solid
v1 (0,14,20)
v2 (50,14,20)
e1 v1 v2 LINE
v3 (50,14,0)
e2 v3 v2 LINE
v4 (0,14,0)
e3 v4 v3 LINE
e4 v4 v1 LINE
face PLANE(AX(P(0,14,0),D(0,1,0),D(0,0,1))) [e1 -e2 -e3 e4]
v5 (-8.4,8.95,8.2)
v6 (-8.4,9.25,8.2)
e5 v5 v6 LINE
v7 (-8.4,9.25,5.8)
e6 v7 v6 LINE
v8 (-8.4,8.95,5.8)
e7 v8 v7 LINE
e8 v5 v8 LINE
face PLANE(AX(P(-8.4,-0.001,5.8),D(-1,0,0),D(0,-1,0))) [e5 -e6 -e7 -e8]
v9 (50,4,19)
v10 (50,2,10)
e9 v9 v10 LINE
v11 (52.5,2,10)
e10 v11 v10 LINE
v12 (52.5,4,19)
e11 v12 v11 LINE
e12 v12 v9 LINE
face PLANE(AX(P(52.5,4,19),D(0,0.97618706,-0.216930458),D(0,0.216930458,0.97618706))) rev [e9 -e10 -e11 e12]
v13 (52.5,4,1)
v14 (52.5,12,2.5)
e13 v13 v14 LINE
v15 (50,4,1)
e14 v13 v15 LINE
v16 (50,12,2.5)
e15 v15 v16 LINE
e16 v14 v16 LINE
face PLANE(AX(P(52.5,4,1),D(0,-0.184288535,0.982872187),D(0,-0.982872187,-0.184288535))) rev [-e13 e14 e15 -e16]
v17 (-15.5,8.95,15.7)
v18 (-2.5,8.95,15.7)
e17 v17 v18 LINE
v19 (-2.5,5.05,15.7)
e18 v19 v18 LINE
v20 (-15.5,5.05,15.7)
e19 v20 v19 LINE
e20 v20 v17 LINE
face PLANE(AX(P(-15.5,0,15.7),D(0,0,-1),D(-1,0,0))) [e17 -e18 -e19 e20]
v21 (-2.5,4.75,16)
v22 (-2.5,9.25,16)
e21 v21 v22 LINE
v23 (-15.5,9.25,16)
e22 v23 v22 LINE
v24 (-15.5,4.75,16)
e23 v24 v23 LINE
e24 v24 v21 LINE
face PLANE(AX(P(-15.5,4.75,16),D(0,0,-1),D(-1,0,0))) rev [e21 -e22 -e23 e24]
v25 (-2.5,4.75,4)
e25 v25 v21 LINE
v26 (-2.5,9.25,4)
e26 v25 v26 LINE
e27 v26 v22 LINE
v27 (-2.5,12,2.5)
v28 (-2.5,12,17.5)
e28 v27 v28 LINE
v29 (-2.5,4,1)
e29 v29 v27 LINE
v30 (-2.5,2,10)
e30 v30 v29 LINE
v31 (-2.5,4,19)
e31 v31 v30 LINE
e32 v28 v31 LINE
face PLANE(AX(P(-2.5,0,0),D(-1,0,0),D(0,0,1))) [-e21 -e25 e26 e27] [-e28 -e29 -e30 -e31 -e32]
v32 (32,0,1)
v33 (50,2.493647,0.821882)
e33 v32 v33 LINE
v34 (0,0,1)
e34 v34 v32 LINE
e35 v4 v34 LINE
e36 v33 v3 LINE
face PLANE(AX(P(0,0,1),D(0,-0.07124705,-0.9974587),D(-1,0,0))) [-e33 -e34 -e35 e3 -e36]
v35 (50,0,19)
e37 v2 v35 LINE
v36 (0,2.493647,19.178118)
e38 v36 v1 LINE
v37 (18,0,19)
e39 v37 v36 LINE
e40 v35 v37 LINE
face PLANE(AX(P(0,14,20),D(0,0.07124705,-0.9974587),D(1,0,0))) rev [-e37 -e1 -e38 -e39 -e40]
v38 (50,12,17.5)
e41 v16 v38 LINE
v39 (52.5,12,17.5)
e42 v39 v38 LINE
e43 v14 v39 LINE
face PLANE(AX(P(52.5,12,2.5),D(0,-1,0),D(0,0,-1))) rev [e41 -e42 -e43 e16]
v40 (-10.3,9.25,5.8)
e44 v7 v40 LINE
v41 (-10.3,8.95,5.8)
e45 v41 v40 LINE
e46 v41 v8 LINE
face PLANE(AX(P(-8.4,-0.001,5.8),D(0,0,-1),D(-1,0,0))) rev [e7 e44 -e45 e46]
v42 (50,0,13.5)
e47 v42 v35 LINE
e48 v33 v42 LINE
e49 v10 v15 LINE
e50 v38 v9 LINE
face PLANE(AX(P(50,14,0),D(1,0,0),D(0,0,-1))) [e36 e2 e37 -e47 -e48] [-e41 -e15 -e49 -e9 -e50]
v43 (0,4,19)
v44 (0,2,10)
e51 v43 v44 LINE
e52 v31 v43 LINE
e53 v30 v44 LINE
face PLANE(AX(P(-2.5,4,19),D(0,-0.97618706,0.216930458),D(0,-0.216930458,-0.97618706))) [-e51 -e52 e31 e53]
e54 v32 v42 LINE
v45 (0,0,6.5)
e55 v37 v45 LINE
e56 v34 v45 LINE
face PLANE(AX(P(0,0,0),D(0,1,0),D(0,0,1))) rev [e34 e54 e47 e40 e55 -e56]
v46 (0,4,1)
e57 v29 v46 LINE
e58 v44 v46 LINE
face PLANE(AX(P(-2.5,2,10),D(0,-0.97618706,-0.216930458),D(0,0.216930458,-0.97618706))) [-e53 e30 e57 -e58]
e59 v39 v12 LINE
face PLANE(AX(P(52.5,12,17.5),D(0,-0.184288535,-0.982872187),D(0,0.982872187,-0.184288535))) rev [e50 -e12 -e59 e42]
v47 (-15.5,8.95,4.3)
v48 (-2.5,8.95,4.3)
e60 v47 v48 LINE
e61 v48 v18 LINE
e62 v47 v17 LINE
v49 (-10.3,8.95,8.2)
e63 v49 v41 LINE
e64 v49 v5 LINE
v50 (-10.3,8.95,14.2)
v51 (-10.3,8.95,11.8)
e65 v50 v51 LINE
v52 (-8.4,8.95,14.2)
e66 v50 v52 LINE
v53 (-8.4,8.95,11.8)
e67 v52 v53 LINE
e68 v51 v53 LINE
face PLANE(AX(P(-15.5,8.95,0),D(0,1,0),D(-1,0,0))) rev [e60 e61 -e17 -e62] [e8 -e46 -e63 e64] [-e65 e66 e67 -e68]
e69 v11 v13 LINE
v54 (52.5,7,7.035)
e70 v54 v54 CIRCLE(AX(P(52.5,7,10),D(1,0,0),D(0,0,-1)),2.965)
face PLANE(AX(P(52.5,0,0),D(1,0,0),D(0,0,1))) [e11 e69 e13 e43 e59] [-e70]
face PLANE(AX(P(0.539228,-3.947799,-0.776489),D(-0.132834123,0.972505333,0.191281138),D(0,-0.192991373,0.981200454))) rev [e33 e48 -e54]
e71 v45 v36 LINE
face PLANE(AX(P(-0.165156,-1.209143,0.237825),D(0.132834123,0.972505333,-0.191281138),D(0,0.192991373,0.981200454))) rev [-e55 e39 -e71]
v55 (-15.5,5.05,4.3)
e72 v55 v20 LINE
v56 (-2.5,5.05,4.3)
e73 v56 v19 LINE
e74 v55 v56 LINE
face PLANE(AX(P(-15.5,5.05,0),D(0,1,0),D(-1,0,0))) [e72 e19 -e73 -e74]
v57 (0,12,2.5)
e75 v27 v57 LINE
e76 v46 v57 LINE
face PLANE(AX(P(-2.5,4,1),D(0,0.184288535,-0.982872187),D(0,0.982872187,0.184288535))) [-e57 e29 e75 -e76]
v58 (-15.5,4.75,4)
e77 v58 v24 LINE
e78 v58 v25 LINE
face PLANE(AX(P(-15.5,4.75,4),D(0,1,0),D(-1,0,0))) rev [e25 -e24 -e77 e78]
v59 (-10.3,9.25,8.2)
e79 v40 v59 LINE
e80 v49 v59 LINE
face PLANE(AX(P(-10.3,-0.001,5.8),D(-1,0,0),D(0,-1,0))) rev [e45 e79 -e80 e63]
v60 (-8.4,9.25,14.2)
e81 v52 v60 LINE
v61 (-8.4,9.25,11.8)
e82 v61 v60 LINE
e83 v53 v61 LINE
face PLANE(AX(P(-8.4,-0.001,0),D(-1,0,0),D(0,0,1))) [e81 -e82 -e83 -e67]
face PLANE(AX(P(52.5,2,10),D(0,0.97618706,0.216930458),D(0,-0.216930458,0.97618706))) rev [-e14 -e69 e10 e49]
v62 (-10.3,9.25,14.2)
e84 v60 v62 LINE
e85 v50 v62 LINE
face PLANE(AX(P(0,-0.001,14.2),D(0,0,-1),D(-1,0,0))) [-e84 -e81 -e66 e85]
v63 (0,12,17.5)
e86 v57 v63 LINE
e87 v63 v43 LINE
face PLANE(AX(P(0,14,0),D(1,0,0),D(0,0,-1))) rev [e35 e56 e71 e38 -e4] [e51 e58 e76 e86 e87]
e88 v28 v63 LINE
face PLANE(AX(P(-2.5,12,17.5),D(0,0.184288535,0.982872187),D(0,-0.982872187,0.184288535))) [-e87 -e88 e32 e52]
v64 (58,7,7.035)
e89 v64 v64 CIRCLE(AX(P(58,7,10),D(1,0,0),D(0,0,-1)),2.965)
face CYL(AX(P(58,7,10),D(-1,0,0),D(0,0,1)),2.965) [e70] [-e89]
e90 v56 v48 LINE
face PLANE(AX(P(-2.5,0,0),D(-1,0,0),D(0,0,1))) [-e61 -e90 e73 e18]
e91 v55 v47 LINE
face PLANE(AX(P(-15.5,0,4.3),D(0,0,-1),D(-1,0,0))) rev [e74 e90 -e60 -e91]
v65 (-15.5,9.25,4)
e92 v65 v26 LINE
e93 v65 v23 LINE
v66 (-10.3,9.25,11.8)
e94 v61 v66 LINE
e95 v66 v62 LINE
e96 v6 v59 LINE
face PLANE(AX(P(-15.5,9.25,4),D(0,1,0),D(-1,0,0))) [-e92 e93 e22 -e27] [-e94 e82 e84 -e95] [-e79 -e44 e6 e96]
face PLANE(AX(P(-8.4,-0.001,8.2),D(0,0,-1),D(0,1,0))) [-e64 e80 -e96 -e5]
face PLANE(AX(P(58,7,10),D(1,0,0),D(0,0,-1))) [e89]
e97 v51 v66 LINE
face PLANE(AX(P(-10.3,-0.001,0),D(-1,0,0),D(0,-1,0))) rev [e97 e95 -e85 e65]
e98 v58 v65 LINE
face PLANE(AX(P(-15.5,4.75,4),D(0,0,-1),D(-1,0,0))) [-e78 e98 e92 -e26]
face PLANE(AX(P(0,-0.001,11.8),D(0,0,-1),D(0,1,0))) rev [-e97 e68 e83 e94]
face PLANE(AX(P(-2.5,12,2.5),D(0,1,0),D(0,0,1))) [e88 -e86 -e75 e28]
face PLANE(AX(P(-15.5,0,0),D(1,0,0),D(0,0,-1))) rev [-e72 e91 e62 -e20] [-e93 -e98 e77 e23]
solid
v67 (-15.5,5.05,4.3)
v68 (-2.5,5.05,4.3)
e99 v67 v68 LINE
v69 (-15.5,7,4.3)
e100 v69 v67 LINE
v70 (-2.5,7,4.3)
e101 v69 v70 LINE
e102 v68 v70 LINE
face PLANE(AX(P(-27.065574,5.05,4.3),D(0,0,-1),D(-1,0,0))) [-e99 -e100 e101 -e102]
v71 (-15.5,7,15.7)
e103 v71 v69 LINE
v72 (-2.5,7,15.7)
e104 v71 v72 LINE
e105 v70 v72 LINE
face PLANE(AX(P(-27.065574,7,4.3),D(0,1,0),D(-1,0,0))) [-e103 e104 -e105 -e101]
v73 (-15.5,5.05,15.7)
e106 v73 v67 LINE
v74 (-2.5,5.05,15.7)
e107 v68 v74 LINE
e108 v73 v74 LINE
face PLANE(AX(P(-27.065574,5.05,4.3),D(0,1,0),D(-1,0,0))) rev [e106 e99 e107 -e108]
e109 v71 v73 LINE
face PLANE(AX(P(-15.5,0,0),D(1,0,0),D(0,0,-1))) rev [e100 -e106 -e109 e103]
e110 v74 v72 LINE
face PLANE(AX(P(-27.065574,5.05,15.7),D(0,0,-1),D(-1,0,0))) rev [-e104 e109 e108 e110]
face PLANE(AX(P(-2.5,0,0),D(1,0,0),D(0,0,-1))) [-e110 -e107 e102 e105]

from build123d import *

# Parameters (mm, degrees)
SKETCH1_W           = 50
SKETCH1_H           = 20
BOSS_EXTRUDE1_DEPTH = 14
BOSS_EXTRUDE2_DEPTH = 2.5
SKETCH3_W           = 12
SKETCH3_H           = 4.5
SKETCH3_W_2         = 11.4
SKETCH3_H_2         = 3.9
EXTRUDE_THIN1_DEPTH = 13
SKETCH3_3_W         = 11.4
SKETCH3_3_H         = 1.95
BOSS_EXTRUDE3_DEPTH = 13
SKETCH5_W           = 1.9
SKETCH5_H           = 2.4
CUT_EXTRUDE1_DEPTH  = 0.3
SKETCH6_R           = 2.965
BOSS_EXTRUDE4_DEPTH = 5.5
CHAMFER1_SIZE       = 14
CHAMFER1_SIZE_2     = 1
CHAMFER2_SIZE       = 14
CHAMFER2_SIZE_2     = 1
CHAMFER3_START      = -5
CHAMFER3_OUTLINE_W  = 21
CHAMFER3_OUTLINE_H  = 16
CHAMFER3_DEPTH      = 3.756672606
CHAMFER6_START      = 4.059410809
CHAMFER6_OUTLINE_W  = 21
CHAMFER6_OUTLINE_H  = 16
CHAMFER6_DEPTH      = 2.940589191


with BuildPart() as part:
    # Sketch1 → Boss-Extrude1 (new body)
    with BuildSketch(Plane(origin=(0, 0, 0), x_dir=(1, 0, 0), z_dir=(0, 1, 0))):
        with Locations((25, -10)):
            Rectangle(SKETCH1_W, SKETCH1_H)
    extrude(amount=BOSS_EXTRUDE1_DEPTH)

    # Sketch2 → Boss-Extrude2 (add)
    with BuildSketch(Plane.ZY):
        Polygon((2.5, 12), (17.5, 12), (19, 4), (10, 2), (1, 4), align=None)
    boss_extrude2 = extrude(amount=BOSS_EXTRUDE2_DEPTH)

    # Mirror1: Boss-Extrude2 across plane
    add(boss_extrude2.mirror(Plane.ZY.offset(-25)))

    # Sketch3 → Extrude-Thin1 (add)
    with BuildSketch(Plane.ZY.offset(2.5)):
        with Locations((10, 7)):
            Rectangle(SKETCH3_W, SKETCH3_H)
        with Locations((10, 7)):
            Rectangle(SKETCH3_W_2, SKETCH3_H_2, mode=Mode.SUBTRACT)
    extrude(amount=EXTRUDE_THIN1_DEPTH)

    # Sketch5 → Cut-Extrude1 (cut)
    with BuildSketch(Plane(origin=(0, 9.25, 0), x_dir=(1, 0, 0), z_dir=(0, 1, 0))):
        with Locations((-9.35, -13)):
            Rectangle(SKETCH5_W, SKETCH5_H)
        with Locations((-9.35, -7)):
            Rectangle(SKETCH5_W, SKETCH5_H)
    extrude(amount=-CUT_EXTRUDE1_DEPTH, mode=Mode.SUBTRACT)

    # Sketch6 → Boss-Extrude4 (add)
    with BuildSketch(Plane(origin=(52.5, 0, 0), x_dir=(0, 0, -1), z_dir=(1, 0, 0))):
        with Locations((-10, 7)):
            Circle(SKETCH6_R)
    extrude(amount=BOSS_EXTRUDE4_DEPTH)

    # Chamfer1
    # the kernel refuses this chamfer: 14, 1 mm, written as the material it takes off along each edge
    with BuildSketch(Plane(origin=(-36.396578858, 0, 0), x_dir=(0, 1, 0), z_dir=(1, 0, 0))) as chamfer1_piece_1:
        Polygon((CHAMFER1_SIZE, 0), (0, CHAMFER1_SIZE_2), (0, 0), align=None)
    extrude(amount=122.793157716, mode=Mode.SUBTRACT)

    # Chamfer2
    # the kernel refuses this chamfer: 14, 1 mm, written as the material it takes off along each edge
    with BuildSketch(Plane(origin=(86.396578858, 0, 20), x_dir=(0, 1, 0), z_dir=(-1, 0, 0))) as chamfer2_piece_1:
        Polygon((CHAMFER2_SIZE, 0), (0, CHAMFER2_SIZE_2), (0, 0), align=None)
    extrude(amount=122.793157716, mode=Mode.SUBTRACT)

    # Chamfer3: read off the stored shape, not the designer's step
    # Chamfer3 outline → Chamfer3 (cut)
    with BuildSketch(Plane(origin=(0, 0, 0), x_dir=(0.9911382828246236, -0.13033690205825316, 0.025635839781716227), z_dir=(0.13283412332475603, 0.9725053326762371, -0.19128113758764903)).offset(CHAMFER3_START)):
        with Locations((9.5, -13)):
            Rectangle(CHAMFER3_OUTLINE_W, CHAMFER3_OUTLINE_H)
    extrude(amount=CHAMFER3_DEPTH, mode=Mode.SUBTRACT)

    # Chamfer6: read off the stored shape, not the designer's step
    # Chamfer6 outline → Chamfer6 (cut)
    with BuildSketch(Plane(origin=(0, 0, 0), x_dir=(0.9911382828246236, 0.13033690205825316, 0.025635839781716227), z_dir=(0.13283412332475603, -0.9725053326762371, -0.19128113758764903)).offset(CHAMFER6_START)):
        with Locations((40.5, 7)):
            Rectangle(CHAMFER6_OUTLINE_W, CHAMFER6_OUTLINE_H)
    extrude(amount=CHAMFER6_DEPTH, mode=Mode.SUBTRACT)


with BuildPart() as body_2:
    # Sketch3<3> → Boss-Extrude3 (new body)
    with BuildSketch(Plane.ZY.offset(2.5)):
        with Locations((10, 6.025)):
            Rectangle(SKETCH3_3_W, SKETCH3_3_H)
    extrude(amount=BOSS_EXTRUDE3_DEPTH)


solid = Compound([part.part, body_2.part])
